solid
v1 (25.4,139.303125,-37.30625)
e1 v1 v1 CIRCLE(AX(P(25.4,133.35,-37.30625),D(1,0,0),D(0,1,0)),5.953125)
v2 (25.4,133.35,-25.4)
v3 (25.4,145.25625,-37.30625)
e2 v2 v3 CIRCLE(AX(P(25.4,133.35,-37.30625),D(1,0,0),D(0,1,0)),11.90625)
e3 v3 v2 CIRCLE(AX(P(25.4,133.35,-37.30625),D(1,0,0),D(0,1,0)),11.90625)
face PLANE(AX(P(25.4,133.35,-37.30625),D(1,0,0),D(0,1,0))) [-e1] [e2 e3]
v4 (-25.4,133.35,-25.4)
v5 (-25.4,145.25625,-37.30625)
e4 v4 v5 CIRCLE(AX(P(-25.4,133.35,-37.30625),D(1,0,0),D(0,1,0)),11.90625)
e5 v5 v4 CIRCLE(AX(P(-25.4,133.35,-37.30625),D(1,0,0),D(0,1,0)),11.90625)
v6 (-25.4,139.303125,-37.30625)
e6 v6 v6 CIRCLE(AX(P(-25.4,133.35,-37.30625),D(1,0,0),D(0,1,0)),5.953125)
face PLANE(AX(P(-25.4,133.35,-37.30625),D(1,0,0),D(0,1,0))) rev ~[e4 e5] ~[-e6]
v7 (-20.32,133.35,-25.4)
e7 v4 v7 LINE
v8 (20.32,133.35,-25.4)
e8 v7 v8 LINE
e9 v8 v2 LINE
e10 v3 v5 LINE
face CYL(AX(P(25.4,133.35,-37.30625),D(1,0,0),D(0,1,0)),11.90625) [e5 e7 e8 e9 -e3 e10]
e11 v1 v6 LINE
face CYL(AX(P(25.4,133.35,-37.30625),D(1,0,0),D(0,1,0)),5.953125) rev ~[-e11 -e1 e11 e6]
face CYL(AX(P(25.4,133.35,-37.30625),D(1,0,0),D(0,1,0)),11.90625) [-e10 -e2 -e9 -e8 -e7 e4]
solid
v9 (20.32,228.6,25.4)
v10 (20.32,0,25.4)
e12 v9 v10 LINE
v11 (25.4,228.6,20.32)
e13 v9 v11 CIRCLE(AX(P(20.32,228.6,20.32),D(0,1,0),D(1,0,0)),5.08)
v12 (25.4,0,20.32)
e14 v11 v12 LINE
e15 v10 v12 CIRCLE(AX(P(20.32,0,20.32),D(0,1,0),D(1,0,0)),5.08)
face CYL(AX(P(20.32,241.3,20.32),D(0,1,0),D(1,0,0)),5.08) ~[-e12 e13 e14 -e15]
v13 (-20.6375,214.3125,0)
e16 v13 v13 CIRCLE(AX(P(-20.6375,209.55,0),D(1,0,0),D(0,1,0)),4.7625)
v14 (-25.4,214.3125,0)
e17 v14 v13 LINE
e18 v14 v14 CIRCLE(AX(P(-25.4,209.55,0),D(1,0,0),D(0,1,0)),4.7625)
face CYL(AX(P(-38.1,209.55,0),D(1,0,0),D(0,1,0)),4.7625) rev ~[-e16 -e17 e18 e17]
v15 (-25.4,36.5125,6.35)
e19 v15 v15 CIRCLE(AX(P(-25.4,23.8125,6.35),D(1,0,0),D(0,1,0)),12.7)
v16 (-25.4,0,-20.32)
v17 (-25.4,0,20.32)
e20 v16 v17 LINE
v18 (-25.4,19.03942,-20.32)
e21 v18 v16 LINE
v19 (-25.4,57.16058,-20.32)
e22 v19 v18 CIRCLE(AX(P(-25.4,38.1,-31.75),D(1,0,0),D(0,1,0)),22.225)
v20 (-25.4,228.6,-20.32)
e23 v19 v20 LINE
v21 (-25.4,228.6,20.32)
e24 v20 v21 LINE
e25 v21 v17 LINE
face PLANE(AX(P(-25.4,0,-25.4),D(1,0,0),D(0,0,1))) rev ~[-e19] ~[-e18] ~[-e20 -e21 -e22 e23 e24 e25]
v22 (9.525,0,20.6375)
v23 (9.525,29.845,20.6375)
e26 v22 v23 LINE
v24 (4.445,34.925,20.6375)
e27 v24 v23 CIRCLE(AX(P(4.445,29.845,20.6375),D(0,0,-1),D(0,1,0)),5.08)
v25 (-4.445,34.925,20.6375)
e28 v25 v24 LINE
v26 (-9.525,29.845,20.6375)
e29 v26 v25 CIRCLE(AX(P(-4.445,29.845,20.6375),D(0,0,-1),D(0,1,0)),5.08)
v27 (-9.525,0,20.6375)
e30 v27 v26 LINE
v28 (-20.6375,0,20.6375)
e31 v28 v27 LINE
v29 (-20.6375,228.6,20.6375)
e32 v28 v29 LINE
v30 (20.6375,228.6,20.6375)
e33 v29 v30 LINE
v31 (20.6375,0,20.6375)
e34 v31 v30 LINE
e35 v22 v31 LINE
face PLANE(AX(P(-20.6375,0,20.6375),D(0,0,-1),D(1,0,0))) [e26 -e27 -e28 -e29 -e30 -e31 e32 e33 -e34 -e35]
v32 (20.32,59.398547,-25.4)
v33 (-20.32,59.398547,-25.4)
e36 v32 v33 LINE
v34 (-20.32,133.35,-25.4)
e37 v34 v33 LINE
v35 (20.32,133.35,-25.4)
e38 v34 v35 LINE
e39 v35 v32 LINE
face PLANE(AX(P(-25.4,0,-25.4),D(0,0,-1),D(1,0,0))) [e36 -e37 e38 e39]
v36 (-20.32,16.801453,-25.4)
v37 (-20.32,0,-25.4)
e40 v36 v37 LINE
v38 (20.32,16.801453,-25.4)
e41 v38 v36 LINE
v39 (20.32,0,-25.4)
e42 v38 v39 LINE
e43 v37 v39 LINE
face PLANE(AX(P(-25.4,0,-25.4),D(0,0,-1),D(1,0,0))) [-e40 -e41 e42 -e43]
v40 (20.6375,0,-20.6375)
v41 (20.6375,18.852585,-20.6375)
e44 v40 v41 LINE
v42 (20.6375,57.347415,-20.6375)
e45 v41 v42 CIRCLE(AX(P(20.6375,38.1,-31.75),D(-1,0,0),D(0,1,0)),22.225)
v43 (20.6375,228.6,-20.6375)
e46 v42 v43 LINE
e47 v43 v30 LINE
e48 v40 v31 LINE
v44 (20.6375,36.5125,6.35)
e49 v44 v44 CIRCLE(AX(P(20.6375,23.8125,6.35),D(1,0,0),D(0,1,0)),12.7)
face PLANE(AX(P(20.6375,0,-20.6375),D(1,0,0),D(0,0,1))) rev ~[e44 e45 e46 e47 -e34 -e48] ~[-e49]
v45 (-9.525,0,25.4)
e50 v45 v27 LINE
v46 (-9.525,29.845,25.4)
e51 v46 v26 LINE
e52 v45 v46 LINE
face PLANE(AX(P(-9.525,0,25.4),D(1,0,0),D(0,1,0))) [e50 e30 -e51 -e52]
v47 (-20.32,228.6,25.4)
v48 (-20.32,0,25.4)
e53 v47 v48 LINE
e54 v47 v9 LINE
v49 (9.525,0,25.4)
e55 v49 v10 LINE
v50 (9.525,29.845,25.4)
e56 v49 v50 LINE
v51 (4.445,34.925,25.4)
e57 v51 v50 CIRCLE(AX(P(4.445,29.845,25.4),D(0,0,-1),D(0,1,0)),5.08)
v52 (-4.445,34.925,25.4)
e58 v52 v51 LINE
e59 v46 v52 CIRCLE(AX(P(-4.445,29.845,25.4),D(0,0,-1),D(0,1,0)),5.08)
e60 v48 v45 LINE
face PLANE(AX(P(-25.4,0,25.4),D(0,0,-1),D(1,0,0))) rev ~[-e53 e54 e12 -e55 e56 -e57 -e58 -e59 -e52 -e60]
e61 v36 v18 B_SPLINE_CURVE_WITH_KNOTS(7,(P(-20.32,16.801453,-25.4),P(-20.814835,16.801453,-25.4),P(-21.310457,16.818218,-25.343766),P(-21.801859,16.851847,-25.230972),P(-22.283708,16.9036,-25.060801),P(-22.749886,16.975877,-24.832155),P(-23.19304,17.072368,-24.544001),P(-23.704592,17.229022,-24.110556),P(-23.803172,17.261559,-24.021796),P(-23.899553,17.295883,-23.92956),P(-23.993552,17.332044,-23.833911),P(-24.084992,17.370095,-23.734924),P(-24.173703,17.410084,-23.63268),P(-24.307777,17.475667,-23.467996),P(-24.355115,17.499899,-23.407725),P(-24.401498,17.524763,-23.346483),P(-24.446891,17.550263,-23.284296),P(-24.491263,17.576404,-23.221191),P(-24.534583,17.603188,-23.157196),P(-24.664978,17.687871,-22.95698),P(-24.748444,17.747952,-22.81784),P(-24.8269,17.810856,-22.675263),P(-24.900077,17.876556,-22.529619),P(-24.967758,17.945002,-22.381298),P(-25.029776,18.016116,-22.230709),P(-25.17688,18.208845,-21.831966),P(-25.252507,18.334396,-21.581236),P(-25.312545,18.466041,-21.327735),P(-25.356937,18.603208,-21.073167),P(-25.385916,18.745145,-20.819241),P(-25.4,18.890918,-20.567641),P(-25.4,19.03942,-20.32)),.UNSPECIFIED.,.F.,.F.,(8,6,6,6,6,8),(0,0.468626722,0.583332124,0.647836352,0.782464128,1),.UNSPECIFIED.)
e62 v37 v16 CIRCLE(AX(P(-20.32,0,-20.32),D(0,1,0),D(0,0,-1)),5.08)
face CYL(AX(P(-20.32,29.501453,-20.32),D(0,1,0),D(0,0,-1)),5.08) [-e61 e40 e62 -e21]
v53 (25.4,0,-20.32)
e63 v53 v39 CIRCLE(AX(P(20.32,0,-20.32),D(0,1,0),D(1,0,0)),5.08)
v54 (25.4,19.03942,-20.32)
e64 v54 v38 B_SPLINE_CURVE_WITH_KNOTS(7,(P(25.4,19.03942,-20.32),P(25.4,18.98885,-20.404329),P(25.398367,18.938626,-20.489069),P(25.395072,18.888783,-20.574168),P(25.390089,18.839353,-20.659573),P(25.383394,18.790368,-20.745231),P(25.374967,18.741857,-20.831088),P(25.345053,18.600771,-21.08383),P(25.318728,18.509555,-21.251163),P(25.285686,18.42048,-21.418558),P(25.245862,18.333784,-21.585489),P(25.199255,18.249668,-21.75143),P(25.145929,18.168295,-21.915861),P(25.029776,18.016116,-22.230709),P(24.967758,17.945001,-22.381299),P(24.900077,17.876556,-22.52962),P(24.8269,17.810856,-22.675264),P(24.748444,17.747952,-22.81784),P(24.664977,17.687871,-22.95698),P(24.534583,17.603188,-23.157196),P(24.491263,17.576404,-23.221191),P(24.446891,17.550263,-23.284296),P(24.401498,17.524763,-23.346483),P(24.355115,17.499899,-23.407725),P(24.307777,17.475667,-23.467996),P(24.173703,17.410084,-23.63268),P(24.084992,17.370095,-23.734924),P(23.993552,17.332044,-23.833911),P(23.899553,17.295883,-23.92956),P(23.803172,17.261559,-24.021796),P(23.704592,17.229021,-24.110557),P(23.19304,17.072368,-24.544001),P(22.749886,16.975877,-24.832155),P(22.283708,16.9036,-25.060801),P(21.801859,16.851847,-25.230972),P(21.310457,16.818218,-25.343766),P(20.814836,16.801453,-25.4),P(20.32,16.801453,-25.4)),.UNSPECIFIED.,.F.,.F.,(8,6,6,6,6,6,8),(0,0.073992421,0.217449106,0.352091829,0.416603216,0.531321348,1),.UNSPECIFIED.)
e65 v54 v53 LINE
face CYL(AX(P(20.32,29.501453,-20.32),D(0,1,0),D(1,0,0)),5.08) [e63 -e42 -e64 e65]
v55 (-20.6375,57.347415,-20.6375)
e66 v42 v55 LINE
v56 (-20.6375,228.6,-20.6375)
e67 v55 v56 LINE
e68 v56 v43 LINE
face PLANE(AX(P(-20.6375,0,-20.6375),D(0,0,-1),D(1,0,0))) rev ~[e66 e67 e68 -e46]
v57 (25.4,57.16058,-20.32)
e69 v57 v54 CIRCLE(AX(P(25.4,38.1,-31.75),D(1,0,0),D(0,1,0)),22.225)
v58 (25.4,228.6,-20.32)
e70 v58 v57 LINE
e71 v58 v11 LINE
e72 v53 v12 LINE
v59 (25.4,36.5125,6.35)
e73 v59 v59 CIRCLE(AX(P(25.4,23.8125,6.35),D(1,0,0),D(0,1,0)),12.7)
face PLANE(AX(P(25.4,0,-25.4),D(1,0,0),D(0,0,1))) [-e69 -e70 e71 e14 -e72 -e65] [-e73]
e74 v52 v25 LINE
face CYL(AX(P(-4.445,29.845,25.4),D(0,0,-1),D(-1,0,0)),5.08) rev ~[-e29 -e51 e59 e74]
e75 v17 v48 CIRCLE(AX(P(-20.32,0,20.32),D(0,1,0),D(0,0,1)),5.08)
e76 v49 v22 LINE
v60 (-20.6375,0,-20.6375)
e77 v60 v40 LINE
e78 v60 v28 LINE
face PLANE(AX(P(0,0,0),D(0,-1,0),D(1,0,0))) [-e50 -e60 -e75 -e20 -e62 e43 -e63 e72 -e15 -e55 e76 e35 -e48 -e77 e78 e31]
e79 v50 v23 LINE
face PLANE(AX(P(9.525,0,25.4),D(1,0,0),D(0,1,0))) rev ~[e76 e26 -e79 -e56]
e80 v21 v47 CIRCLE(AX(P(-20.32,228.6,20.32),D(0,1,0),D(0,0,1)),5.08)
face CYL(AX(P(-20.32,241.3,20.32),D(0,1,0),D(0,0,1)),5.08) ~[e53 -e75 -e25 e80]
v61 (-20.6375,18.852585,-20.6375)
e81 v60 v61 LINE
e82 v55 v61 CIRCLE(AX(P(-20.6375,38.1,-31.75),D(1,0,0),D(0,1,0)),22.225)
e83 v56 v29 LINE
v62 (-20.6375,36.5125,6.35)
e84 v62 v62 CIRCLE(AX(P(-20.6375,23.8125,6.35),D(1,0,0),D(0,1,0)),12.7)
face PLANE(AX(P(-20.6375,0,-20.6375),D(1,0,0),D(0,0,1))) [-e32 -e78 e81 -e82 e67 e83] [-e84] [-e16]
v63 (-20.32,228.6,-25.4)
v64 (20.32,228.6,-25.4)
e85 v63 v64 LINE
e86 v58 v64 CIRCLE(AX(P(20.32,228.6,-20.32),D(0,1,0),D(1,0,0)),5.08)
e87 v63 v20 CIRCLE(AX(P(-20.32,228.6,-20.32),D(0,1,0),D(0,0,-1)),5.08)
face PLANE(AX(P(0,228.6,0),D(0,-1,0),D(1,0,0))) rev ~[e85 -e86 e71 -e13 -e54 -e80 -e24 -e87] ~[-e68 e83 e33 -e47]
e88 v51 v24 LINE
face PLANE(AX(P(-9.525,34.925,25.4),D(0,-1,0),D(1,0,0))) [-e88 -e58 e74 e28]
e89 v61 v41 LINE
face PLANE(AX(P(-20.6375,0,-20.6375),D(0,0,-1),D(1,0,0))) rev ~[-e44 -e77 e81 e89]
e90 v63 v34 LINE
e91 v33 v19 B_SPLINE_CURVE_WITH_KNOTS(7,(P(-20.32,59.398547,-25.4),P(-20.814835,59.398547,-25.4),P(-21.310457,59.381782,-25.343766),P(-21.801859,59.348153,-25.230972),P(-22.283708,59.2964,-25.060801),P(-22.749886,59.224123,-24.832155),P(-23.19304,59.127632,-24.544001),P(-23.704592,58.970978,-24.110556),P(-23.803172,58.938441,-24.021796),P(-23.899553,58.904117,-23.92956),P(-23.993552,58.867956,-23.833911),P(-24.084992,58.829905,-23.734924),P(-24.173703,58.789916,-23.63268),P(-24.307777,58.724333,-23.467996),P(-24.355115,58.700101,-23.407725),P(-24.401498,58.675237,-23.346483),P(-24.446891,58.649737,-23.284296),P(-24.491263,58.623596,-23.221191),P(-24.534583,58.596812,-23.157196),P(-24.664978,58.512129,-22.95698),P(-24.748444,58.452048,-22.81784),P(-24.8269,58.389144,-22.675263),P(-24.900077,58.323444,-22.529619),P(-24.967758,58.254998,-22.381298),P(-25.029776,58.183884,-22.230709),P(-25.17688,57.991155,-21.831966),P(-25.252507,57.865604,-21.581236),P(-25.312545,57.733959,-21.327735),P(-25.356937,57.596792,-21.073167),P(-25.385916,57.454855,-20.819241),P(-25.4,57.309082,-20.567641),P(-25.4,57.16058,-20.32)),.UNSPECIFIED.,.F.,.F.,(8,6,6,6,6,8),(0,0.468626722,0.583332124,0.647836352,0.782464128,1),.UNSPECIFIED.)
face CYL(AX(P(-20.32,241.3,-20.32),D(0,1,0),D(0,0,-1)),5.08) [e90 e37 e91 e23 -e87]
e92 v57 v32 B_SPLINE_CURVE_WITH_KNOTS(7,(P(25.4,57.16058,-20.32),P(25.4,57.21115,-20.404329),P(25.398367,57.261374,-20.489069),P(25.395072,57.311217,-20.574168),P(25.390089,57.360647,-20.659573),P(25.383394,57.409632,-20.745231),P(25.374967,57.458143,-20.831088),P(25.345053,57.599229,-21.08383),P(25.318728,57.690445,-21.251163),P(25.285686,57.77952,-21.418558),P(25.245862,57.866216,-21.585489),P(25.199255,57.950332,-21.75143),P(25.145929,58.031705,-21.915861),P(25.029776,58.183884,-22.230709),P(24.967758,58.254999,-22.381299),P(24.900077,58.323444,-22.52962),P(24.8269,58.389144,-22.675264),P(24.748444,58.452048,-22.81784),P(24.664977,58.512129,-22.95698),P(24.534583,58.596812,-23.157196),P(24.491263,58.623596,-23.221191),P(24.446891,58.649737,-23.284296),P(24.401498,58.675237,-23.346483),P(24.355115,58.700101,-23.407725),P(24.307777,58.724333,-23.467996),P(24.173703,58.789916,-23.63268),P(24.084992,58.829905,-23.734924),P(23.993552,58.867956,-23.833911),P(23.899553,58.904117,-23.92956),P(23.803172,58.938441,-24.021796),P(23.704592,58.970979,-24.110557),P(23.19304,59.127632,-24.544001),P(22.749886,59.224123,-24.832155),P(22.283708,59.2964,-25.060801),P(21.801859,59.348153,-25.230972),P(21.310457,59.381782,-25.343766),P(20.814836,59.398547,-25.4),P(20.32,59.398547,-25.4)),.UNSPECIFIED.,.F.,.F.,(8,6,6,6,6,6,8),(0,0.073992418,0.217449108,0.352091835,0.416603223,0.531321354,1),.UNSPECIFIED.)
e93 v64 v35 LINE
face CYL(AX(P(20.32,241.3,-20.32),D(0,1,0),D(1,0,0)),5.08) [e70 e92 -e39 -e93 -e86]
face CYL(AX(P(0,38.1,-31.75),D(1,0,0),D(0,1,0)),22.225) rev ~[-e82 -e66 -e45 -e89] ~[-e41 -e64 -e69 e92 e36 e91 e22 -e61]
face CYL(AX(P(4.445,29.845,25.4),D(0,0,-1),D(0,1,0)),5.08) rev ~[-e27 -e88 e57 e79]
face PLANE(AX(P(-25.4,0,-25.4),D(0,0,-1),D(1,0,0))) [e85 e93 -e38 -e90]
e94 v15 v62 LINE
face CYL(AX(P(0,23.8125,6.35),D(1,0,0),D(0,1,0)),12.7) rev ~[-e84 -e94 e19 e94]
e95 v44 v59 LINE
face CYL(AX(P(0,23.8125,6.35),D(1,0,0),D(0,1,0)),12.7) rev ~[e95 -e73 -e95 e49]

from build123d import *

# Parameters (mm, degrees)
F0_W        = 50.8
F0_H        = 50.8
F0_W_2      = 41.275
F0_H_2      = 41.275
F1_DEPTH    = 228.6
F2_R        = 22.225
F2_R_2      = 12.7
F3_DEPTH    = 25.4
F4_R        = 5.953125
F5_DEPTH    = 50.8
F6_T1_DEPTH = 254
F6_T3_DEPTH = 86.6514525143
F6_T5_DEPTH = 107.95
F6_T7_DEPTH = 42.2014525143
F7_W        = 19.05
F7_H        = 34.925
F8_DEPTH    = 4.7625
F9_R        = 5.08
F11_D       = 9.525
F11_DEPTH   = 12.7
F11_TIP     = 2.8615986981


# Not quite as in the source:
# - a fillet or chamfer that OpenCascade refuses, or shapes differently, is made with other operations: its cross-section is extruded or revolved along the edge and cut away or added


with BuildPart() as f1:
    # F0 (on Front) → F1 (new body)
    with BuildSketch(Plane.XZ):
        Rectangle(F0_W, F0_H)
        Rectangle(F0_W_2, F0_H_2, mode=Mode.SUBTRACT)
    extrude(amount=-F1_DEPTH)

    # F2 (on Right) → F3 (cut, symmetric)
    with BuildSketch(Plane.YZ):
        with Locations((38.1, -31.75)):
            Circle(F2_R)
        with Locations((23.8125, 6.35)):
            Circle(F2_R_2)
    extrude(amount=F3_DEPTH, both=True, mode=Mode.SUBTRACT)

    # F4 (on face) → F5 (join)
    with BuildSketch(Plane.YZ.offset(25.4)):
        with BuildLine():
            ThreePointArc((133.35, -25.4), (124.9310098865, -45.7252401135), (145.25625, -37.30625))
            ThreePointArc((145.25625, -37.30625), (141.7689901135, -28.8872598865), (133.35, -25.4))
        make_face()
        with Locations((133.35, -37.30625)):
            Circle(F4_R, mode=Mode.SUBTRACT)
    extrude(amount=-F5_DEPTH)

    # F6: fillet of radius 5.08 on 8 edges, made by hand

    # F6_s2 → F6_t1 (cut)
    with BuildSketch(Plane.XZ.offset(-241.3)):
        with BuildLine():
            ThreePointArc((25.4, 20.32), (23.9121024484, 23.9121024484), (20.32, 25.4))
            Line((20.32, 25.4), (25.4, 25.4))
            Line((25.4, 25.4), (25.4, 20.32))
        make_face()
        with BuildLine():
            ThreePointArc((-20.32, 25.4), (-23.9121024484, 23.9121024484), (-25.4, 20.32))
            Line((-25.4, 20.32), (-25.4, 25.4))
            Line((-25.4, 25.4), (-20.32, 25.4))
        make_face()
    extrude(amount=F6_T1_DEPTH, mode=Mode.SUBTRACT)

    # F6_s4 → F6_t3 (cut)
    with BuildSketch(Plane.XZ.offset(-133.35)):
        with BuildLine():
            ThreePointArc((25.4, -20.32), (23.9121024484, -23.9121024484), (20.32, -25.4))
            Line((20.32, -25.4), (25.4, -25.4))
            Line((25.4, -25.4), (25.4, -20.32))
        make_face()
        with BuildLine():
            ThreePointArc((-20.32, -25.4), (-23.9121024484, -23.9121024484), (-25.4, -20.32))
            Line((-25.4, -20.32), (-25.4, -25.4))
            Line((-25.4, -25.4), (-20.32, -25.4))
        make_face()
    extrude(amount=F6_T3_DEPTH, mode=Mode.SUBTRACT)

    # F6_s6 → F6_t5 (cut)
    with BuildSketch(Plane.XZ.offset(-241.3)):
        with BuildLine():
            ThreePointArc((25.4, -20.32), (23.9121024484, -23.9121024484), (20.32, -25.4))
            Line((20.32, -25.4), (25.4, -25.4))
            Line((25.4, -25.4), (25.4, -20.32))
        make_face()
        with BuildLine():
            ThreePointArc((-20.32, -25.4), (-23.9121024484, -23.9121024484), (-25.4, -20.32))
            Line((-25.4, -20.32), (-25.4, -25.4))
            Line((-25.4, -25.4), (-20.32, -25.4))
        make_face()
    extrude(amount=F6_T5_DEPTH, mode=Mode.SUBTRACT)

    # F6_s8 → F6_t7 (cut)
    with BuildSketch(Plane.XZ.offset(-29.5014525143)):
        with BuildLine():
            ThreePointArc((25.4, -20.32), (23.9121024484, -23.9121024484), (20.32, -25.4))
            Line((20.32, -25.4), (25.4, -25.4))
            Line((25.4, -25.4), (25.4, -20.32))
        make_face()
        with BuildLine():
            ThreePointArc((-20.32, -25.4), (-23.9121024484, -23.9121024484), (-25.4, -20.32))
            Line((-25.4, -20.32), (-25.4, -25.4))
            Line((-25.4, -25.4), (-20.32, -25.4))
        make_face()
    extrude(amount=F6_T7_DEPTH, mode=Mode.SUBTRACT)

    # F7 (on face) → F8 (cut, through all)
    with BuildSketch(Plane.XY.offset(25.4)):
        with Locations((0, 17.4625)):
            Rectangle(F7_W, F7_H)
    extrude(amount=-F8_DEPTH, mode=Mode.SUBTRACT)

    # F9
    f9_edges = [f1.edges().sort_by_distance(p)[0] for p in [
        (9.525, 34.925, 23.01875),
        (-9.525, 34.925, 23.01875),
    ]]
    fillet(f9_edges, radius=F9_R)

    # F11
    with Locations(Plane(origin=(-25.4, 0, 0), x_dir=(0, -1, 0), z_dir=(-1, 0, 0))):
        with Locations((-209.55, 0)):
            Hole(F11_D / 2, depth=F11_DEPTH)
            with Locations((0, 0, -(F11_DEPTH + F11_TIP / 2))):  # 118° drill point
                Cone(0, F11_D / 2, F11_TIP, mode=Mode.SUBTRACT)


solid = f1.part
